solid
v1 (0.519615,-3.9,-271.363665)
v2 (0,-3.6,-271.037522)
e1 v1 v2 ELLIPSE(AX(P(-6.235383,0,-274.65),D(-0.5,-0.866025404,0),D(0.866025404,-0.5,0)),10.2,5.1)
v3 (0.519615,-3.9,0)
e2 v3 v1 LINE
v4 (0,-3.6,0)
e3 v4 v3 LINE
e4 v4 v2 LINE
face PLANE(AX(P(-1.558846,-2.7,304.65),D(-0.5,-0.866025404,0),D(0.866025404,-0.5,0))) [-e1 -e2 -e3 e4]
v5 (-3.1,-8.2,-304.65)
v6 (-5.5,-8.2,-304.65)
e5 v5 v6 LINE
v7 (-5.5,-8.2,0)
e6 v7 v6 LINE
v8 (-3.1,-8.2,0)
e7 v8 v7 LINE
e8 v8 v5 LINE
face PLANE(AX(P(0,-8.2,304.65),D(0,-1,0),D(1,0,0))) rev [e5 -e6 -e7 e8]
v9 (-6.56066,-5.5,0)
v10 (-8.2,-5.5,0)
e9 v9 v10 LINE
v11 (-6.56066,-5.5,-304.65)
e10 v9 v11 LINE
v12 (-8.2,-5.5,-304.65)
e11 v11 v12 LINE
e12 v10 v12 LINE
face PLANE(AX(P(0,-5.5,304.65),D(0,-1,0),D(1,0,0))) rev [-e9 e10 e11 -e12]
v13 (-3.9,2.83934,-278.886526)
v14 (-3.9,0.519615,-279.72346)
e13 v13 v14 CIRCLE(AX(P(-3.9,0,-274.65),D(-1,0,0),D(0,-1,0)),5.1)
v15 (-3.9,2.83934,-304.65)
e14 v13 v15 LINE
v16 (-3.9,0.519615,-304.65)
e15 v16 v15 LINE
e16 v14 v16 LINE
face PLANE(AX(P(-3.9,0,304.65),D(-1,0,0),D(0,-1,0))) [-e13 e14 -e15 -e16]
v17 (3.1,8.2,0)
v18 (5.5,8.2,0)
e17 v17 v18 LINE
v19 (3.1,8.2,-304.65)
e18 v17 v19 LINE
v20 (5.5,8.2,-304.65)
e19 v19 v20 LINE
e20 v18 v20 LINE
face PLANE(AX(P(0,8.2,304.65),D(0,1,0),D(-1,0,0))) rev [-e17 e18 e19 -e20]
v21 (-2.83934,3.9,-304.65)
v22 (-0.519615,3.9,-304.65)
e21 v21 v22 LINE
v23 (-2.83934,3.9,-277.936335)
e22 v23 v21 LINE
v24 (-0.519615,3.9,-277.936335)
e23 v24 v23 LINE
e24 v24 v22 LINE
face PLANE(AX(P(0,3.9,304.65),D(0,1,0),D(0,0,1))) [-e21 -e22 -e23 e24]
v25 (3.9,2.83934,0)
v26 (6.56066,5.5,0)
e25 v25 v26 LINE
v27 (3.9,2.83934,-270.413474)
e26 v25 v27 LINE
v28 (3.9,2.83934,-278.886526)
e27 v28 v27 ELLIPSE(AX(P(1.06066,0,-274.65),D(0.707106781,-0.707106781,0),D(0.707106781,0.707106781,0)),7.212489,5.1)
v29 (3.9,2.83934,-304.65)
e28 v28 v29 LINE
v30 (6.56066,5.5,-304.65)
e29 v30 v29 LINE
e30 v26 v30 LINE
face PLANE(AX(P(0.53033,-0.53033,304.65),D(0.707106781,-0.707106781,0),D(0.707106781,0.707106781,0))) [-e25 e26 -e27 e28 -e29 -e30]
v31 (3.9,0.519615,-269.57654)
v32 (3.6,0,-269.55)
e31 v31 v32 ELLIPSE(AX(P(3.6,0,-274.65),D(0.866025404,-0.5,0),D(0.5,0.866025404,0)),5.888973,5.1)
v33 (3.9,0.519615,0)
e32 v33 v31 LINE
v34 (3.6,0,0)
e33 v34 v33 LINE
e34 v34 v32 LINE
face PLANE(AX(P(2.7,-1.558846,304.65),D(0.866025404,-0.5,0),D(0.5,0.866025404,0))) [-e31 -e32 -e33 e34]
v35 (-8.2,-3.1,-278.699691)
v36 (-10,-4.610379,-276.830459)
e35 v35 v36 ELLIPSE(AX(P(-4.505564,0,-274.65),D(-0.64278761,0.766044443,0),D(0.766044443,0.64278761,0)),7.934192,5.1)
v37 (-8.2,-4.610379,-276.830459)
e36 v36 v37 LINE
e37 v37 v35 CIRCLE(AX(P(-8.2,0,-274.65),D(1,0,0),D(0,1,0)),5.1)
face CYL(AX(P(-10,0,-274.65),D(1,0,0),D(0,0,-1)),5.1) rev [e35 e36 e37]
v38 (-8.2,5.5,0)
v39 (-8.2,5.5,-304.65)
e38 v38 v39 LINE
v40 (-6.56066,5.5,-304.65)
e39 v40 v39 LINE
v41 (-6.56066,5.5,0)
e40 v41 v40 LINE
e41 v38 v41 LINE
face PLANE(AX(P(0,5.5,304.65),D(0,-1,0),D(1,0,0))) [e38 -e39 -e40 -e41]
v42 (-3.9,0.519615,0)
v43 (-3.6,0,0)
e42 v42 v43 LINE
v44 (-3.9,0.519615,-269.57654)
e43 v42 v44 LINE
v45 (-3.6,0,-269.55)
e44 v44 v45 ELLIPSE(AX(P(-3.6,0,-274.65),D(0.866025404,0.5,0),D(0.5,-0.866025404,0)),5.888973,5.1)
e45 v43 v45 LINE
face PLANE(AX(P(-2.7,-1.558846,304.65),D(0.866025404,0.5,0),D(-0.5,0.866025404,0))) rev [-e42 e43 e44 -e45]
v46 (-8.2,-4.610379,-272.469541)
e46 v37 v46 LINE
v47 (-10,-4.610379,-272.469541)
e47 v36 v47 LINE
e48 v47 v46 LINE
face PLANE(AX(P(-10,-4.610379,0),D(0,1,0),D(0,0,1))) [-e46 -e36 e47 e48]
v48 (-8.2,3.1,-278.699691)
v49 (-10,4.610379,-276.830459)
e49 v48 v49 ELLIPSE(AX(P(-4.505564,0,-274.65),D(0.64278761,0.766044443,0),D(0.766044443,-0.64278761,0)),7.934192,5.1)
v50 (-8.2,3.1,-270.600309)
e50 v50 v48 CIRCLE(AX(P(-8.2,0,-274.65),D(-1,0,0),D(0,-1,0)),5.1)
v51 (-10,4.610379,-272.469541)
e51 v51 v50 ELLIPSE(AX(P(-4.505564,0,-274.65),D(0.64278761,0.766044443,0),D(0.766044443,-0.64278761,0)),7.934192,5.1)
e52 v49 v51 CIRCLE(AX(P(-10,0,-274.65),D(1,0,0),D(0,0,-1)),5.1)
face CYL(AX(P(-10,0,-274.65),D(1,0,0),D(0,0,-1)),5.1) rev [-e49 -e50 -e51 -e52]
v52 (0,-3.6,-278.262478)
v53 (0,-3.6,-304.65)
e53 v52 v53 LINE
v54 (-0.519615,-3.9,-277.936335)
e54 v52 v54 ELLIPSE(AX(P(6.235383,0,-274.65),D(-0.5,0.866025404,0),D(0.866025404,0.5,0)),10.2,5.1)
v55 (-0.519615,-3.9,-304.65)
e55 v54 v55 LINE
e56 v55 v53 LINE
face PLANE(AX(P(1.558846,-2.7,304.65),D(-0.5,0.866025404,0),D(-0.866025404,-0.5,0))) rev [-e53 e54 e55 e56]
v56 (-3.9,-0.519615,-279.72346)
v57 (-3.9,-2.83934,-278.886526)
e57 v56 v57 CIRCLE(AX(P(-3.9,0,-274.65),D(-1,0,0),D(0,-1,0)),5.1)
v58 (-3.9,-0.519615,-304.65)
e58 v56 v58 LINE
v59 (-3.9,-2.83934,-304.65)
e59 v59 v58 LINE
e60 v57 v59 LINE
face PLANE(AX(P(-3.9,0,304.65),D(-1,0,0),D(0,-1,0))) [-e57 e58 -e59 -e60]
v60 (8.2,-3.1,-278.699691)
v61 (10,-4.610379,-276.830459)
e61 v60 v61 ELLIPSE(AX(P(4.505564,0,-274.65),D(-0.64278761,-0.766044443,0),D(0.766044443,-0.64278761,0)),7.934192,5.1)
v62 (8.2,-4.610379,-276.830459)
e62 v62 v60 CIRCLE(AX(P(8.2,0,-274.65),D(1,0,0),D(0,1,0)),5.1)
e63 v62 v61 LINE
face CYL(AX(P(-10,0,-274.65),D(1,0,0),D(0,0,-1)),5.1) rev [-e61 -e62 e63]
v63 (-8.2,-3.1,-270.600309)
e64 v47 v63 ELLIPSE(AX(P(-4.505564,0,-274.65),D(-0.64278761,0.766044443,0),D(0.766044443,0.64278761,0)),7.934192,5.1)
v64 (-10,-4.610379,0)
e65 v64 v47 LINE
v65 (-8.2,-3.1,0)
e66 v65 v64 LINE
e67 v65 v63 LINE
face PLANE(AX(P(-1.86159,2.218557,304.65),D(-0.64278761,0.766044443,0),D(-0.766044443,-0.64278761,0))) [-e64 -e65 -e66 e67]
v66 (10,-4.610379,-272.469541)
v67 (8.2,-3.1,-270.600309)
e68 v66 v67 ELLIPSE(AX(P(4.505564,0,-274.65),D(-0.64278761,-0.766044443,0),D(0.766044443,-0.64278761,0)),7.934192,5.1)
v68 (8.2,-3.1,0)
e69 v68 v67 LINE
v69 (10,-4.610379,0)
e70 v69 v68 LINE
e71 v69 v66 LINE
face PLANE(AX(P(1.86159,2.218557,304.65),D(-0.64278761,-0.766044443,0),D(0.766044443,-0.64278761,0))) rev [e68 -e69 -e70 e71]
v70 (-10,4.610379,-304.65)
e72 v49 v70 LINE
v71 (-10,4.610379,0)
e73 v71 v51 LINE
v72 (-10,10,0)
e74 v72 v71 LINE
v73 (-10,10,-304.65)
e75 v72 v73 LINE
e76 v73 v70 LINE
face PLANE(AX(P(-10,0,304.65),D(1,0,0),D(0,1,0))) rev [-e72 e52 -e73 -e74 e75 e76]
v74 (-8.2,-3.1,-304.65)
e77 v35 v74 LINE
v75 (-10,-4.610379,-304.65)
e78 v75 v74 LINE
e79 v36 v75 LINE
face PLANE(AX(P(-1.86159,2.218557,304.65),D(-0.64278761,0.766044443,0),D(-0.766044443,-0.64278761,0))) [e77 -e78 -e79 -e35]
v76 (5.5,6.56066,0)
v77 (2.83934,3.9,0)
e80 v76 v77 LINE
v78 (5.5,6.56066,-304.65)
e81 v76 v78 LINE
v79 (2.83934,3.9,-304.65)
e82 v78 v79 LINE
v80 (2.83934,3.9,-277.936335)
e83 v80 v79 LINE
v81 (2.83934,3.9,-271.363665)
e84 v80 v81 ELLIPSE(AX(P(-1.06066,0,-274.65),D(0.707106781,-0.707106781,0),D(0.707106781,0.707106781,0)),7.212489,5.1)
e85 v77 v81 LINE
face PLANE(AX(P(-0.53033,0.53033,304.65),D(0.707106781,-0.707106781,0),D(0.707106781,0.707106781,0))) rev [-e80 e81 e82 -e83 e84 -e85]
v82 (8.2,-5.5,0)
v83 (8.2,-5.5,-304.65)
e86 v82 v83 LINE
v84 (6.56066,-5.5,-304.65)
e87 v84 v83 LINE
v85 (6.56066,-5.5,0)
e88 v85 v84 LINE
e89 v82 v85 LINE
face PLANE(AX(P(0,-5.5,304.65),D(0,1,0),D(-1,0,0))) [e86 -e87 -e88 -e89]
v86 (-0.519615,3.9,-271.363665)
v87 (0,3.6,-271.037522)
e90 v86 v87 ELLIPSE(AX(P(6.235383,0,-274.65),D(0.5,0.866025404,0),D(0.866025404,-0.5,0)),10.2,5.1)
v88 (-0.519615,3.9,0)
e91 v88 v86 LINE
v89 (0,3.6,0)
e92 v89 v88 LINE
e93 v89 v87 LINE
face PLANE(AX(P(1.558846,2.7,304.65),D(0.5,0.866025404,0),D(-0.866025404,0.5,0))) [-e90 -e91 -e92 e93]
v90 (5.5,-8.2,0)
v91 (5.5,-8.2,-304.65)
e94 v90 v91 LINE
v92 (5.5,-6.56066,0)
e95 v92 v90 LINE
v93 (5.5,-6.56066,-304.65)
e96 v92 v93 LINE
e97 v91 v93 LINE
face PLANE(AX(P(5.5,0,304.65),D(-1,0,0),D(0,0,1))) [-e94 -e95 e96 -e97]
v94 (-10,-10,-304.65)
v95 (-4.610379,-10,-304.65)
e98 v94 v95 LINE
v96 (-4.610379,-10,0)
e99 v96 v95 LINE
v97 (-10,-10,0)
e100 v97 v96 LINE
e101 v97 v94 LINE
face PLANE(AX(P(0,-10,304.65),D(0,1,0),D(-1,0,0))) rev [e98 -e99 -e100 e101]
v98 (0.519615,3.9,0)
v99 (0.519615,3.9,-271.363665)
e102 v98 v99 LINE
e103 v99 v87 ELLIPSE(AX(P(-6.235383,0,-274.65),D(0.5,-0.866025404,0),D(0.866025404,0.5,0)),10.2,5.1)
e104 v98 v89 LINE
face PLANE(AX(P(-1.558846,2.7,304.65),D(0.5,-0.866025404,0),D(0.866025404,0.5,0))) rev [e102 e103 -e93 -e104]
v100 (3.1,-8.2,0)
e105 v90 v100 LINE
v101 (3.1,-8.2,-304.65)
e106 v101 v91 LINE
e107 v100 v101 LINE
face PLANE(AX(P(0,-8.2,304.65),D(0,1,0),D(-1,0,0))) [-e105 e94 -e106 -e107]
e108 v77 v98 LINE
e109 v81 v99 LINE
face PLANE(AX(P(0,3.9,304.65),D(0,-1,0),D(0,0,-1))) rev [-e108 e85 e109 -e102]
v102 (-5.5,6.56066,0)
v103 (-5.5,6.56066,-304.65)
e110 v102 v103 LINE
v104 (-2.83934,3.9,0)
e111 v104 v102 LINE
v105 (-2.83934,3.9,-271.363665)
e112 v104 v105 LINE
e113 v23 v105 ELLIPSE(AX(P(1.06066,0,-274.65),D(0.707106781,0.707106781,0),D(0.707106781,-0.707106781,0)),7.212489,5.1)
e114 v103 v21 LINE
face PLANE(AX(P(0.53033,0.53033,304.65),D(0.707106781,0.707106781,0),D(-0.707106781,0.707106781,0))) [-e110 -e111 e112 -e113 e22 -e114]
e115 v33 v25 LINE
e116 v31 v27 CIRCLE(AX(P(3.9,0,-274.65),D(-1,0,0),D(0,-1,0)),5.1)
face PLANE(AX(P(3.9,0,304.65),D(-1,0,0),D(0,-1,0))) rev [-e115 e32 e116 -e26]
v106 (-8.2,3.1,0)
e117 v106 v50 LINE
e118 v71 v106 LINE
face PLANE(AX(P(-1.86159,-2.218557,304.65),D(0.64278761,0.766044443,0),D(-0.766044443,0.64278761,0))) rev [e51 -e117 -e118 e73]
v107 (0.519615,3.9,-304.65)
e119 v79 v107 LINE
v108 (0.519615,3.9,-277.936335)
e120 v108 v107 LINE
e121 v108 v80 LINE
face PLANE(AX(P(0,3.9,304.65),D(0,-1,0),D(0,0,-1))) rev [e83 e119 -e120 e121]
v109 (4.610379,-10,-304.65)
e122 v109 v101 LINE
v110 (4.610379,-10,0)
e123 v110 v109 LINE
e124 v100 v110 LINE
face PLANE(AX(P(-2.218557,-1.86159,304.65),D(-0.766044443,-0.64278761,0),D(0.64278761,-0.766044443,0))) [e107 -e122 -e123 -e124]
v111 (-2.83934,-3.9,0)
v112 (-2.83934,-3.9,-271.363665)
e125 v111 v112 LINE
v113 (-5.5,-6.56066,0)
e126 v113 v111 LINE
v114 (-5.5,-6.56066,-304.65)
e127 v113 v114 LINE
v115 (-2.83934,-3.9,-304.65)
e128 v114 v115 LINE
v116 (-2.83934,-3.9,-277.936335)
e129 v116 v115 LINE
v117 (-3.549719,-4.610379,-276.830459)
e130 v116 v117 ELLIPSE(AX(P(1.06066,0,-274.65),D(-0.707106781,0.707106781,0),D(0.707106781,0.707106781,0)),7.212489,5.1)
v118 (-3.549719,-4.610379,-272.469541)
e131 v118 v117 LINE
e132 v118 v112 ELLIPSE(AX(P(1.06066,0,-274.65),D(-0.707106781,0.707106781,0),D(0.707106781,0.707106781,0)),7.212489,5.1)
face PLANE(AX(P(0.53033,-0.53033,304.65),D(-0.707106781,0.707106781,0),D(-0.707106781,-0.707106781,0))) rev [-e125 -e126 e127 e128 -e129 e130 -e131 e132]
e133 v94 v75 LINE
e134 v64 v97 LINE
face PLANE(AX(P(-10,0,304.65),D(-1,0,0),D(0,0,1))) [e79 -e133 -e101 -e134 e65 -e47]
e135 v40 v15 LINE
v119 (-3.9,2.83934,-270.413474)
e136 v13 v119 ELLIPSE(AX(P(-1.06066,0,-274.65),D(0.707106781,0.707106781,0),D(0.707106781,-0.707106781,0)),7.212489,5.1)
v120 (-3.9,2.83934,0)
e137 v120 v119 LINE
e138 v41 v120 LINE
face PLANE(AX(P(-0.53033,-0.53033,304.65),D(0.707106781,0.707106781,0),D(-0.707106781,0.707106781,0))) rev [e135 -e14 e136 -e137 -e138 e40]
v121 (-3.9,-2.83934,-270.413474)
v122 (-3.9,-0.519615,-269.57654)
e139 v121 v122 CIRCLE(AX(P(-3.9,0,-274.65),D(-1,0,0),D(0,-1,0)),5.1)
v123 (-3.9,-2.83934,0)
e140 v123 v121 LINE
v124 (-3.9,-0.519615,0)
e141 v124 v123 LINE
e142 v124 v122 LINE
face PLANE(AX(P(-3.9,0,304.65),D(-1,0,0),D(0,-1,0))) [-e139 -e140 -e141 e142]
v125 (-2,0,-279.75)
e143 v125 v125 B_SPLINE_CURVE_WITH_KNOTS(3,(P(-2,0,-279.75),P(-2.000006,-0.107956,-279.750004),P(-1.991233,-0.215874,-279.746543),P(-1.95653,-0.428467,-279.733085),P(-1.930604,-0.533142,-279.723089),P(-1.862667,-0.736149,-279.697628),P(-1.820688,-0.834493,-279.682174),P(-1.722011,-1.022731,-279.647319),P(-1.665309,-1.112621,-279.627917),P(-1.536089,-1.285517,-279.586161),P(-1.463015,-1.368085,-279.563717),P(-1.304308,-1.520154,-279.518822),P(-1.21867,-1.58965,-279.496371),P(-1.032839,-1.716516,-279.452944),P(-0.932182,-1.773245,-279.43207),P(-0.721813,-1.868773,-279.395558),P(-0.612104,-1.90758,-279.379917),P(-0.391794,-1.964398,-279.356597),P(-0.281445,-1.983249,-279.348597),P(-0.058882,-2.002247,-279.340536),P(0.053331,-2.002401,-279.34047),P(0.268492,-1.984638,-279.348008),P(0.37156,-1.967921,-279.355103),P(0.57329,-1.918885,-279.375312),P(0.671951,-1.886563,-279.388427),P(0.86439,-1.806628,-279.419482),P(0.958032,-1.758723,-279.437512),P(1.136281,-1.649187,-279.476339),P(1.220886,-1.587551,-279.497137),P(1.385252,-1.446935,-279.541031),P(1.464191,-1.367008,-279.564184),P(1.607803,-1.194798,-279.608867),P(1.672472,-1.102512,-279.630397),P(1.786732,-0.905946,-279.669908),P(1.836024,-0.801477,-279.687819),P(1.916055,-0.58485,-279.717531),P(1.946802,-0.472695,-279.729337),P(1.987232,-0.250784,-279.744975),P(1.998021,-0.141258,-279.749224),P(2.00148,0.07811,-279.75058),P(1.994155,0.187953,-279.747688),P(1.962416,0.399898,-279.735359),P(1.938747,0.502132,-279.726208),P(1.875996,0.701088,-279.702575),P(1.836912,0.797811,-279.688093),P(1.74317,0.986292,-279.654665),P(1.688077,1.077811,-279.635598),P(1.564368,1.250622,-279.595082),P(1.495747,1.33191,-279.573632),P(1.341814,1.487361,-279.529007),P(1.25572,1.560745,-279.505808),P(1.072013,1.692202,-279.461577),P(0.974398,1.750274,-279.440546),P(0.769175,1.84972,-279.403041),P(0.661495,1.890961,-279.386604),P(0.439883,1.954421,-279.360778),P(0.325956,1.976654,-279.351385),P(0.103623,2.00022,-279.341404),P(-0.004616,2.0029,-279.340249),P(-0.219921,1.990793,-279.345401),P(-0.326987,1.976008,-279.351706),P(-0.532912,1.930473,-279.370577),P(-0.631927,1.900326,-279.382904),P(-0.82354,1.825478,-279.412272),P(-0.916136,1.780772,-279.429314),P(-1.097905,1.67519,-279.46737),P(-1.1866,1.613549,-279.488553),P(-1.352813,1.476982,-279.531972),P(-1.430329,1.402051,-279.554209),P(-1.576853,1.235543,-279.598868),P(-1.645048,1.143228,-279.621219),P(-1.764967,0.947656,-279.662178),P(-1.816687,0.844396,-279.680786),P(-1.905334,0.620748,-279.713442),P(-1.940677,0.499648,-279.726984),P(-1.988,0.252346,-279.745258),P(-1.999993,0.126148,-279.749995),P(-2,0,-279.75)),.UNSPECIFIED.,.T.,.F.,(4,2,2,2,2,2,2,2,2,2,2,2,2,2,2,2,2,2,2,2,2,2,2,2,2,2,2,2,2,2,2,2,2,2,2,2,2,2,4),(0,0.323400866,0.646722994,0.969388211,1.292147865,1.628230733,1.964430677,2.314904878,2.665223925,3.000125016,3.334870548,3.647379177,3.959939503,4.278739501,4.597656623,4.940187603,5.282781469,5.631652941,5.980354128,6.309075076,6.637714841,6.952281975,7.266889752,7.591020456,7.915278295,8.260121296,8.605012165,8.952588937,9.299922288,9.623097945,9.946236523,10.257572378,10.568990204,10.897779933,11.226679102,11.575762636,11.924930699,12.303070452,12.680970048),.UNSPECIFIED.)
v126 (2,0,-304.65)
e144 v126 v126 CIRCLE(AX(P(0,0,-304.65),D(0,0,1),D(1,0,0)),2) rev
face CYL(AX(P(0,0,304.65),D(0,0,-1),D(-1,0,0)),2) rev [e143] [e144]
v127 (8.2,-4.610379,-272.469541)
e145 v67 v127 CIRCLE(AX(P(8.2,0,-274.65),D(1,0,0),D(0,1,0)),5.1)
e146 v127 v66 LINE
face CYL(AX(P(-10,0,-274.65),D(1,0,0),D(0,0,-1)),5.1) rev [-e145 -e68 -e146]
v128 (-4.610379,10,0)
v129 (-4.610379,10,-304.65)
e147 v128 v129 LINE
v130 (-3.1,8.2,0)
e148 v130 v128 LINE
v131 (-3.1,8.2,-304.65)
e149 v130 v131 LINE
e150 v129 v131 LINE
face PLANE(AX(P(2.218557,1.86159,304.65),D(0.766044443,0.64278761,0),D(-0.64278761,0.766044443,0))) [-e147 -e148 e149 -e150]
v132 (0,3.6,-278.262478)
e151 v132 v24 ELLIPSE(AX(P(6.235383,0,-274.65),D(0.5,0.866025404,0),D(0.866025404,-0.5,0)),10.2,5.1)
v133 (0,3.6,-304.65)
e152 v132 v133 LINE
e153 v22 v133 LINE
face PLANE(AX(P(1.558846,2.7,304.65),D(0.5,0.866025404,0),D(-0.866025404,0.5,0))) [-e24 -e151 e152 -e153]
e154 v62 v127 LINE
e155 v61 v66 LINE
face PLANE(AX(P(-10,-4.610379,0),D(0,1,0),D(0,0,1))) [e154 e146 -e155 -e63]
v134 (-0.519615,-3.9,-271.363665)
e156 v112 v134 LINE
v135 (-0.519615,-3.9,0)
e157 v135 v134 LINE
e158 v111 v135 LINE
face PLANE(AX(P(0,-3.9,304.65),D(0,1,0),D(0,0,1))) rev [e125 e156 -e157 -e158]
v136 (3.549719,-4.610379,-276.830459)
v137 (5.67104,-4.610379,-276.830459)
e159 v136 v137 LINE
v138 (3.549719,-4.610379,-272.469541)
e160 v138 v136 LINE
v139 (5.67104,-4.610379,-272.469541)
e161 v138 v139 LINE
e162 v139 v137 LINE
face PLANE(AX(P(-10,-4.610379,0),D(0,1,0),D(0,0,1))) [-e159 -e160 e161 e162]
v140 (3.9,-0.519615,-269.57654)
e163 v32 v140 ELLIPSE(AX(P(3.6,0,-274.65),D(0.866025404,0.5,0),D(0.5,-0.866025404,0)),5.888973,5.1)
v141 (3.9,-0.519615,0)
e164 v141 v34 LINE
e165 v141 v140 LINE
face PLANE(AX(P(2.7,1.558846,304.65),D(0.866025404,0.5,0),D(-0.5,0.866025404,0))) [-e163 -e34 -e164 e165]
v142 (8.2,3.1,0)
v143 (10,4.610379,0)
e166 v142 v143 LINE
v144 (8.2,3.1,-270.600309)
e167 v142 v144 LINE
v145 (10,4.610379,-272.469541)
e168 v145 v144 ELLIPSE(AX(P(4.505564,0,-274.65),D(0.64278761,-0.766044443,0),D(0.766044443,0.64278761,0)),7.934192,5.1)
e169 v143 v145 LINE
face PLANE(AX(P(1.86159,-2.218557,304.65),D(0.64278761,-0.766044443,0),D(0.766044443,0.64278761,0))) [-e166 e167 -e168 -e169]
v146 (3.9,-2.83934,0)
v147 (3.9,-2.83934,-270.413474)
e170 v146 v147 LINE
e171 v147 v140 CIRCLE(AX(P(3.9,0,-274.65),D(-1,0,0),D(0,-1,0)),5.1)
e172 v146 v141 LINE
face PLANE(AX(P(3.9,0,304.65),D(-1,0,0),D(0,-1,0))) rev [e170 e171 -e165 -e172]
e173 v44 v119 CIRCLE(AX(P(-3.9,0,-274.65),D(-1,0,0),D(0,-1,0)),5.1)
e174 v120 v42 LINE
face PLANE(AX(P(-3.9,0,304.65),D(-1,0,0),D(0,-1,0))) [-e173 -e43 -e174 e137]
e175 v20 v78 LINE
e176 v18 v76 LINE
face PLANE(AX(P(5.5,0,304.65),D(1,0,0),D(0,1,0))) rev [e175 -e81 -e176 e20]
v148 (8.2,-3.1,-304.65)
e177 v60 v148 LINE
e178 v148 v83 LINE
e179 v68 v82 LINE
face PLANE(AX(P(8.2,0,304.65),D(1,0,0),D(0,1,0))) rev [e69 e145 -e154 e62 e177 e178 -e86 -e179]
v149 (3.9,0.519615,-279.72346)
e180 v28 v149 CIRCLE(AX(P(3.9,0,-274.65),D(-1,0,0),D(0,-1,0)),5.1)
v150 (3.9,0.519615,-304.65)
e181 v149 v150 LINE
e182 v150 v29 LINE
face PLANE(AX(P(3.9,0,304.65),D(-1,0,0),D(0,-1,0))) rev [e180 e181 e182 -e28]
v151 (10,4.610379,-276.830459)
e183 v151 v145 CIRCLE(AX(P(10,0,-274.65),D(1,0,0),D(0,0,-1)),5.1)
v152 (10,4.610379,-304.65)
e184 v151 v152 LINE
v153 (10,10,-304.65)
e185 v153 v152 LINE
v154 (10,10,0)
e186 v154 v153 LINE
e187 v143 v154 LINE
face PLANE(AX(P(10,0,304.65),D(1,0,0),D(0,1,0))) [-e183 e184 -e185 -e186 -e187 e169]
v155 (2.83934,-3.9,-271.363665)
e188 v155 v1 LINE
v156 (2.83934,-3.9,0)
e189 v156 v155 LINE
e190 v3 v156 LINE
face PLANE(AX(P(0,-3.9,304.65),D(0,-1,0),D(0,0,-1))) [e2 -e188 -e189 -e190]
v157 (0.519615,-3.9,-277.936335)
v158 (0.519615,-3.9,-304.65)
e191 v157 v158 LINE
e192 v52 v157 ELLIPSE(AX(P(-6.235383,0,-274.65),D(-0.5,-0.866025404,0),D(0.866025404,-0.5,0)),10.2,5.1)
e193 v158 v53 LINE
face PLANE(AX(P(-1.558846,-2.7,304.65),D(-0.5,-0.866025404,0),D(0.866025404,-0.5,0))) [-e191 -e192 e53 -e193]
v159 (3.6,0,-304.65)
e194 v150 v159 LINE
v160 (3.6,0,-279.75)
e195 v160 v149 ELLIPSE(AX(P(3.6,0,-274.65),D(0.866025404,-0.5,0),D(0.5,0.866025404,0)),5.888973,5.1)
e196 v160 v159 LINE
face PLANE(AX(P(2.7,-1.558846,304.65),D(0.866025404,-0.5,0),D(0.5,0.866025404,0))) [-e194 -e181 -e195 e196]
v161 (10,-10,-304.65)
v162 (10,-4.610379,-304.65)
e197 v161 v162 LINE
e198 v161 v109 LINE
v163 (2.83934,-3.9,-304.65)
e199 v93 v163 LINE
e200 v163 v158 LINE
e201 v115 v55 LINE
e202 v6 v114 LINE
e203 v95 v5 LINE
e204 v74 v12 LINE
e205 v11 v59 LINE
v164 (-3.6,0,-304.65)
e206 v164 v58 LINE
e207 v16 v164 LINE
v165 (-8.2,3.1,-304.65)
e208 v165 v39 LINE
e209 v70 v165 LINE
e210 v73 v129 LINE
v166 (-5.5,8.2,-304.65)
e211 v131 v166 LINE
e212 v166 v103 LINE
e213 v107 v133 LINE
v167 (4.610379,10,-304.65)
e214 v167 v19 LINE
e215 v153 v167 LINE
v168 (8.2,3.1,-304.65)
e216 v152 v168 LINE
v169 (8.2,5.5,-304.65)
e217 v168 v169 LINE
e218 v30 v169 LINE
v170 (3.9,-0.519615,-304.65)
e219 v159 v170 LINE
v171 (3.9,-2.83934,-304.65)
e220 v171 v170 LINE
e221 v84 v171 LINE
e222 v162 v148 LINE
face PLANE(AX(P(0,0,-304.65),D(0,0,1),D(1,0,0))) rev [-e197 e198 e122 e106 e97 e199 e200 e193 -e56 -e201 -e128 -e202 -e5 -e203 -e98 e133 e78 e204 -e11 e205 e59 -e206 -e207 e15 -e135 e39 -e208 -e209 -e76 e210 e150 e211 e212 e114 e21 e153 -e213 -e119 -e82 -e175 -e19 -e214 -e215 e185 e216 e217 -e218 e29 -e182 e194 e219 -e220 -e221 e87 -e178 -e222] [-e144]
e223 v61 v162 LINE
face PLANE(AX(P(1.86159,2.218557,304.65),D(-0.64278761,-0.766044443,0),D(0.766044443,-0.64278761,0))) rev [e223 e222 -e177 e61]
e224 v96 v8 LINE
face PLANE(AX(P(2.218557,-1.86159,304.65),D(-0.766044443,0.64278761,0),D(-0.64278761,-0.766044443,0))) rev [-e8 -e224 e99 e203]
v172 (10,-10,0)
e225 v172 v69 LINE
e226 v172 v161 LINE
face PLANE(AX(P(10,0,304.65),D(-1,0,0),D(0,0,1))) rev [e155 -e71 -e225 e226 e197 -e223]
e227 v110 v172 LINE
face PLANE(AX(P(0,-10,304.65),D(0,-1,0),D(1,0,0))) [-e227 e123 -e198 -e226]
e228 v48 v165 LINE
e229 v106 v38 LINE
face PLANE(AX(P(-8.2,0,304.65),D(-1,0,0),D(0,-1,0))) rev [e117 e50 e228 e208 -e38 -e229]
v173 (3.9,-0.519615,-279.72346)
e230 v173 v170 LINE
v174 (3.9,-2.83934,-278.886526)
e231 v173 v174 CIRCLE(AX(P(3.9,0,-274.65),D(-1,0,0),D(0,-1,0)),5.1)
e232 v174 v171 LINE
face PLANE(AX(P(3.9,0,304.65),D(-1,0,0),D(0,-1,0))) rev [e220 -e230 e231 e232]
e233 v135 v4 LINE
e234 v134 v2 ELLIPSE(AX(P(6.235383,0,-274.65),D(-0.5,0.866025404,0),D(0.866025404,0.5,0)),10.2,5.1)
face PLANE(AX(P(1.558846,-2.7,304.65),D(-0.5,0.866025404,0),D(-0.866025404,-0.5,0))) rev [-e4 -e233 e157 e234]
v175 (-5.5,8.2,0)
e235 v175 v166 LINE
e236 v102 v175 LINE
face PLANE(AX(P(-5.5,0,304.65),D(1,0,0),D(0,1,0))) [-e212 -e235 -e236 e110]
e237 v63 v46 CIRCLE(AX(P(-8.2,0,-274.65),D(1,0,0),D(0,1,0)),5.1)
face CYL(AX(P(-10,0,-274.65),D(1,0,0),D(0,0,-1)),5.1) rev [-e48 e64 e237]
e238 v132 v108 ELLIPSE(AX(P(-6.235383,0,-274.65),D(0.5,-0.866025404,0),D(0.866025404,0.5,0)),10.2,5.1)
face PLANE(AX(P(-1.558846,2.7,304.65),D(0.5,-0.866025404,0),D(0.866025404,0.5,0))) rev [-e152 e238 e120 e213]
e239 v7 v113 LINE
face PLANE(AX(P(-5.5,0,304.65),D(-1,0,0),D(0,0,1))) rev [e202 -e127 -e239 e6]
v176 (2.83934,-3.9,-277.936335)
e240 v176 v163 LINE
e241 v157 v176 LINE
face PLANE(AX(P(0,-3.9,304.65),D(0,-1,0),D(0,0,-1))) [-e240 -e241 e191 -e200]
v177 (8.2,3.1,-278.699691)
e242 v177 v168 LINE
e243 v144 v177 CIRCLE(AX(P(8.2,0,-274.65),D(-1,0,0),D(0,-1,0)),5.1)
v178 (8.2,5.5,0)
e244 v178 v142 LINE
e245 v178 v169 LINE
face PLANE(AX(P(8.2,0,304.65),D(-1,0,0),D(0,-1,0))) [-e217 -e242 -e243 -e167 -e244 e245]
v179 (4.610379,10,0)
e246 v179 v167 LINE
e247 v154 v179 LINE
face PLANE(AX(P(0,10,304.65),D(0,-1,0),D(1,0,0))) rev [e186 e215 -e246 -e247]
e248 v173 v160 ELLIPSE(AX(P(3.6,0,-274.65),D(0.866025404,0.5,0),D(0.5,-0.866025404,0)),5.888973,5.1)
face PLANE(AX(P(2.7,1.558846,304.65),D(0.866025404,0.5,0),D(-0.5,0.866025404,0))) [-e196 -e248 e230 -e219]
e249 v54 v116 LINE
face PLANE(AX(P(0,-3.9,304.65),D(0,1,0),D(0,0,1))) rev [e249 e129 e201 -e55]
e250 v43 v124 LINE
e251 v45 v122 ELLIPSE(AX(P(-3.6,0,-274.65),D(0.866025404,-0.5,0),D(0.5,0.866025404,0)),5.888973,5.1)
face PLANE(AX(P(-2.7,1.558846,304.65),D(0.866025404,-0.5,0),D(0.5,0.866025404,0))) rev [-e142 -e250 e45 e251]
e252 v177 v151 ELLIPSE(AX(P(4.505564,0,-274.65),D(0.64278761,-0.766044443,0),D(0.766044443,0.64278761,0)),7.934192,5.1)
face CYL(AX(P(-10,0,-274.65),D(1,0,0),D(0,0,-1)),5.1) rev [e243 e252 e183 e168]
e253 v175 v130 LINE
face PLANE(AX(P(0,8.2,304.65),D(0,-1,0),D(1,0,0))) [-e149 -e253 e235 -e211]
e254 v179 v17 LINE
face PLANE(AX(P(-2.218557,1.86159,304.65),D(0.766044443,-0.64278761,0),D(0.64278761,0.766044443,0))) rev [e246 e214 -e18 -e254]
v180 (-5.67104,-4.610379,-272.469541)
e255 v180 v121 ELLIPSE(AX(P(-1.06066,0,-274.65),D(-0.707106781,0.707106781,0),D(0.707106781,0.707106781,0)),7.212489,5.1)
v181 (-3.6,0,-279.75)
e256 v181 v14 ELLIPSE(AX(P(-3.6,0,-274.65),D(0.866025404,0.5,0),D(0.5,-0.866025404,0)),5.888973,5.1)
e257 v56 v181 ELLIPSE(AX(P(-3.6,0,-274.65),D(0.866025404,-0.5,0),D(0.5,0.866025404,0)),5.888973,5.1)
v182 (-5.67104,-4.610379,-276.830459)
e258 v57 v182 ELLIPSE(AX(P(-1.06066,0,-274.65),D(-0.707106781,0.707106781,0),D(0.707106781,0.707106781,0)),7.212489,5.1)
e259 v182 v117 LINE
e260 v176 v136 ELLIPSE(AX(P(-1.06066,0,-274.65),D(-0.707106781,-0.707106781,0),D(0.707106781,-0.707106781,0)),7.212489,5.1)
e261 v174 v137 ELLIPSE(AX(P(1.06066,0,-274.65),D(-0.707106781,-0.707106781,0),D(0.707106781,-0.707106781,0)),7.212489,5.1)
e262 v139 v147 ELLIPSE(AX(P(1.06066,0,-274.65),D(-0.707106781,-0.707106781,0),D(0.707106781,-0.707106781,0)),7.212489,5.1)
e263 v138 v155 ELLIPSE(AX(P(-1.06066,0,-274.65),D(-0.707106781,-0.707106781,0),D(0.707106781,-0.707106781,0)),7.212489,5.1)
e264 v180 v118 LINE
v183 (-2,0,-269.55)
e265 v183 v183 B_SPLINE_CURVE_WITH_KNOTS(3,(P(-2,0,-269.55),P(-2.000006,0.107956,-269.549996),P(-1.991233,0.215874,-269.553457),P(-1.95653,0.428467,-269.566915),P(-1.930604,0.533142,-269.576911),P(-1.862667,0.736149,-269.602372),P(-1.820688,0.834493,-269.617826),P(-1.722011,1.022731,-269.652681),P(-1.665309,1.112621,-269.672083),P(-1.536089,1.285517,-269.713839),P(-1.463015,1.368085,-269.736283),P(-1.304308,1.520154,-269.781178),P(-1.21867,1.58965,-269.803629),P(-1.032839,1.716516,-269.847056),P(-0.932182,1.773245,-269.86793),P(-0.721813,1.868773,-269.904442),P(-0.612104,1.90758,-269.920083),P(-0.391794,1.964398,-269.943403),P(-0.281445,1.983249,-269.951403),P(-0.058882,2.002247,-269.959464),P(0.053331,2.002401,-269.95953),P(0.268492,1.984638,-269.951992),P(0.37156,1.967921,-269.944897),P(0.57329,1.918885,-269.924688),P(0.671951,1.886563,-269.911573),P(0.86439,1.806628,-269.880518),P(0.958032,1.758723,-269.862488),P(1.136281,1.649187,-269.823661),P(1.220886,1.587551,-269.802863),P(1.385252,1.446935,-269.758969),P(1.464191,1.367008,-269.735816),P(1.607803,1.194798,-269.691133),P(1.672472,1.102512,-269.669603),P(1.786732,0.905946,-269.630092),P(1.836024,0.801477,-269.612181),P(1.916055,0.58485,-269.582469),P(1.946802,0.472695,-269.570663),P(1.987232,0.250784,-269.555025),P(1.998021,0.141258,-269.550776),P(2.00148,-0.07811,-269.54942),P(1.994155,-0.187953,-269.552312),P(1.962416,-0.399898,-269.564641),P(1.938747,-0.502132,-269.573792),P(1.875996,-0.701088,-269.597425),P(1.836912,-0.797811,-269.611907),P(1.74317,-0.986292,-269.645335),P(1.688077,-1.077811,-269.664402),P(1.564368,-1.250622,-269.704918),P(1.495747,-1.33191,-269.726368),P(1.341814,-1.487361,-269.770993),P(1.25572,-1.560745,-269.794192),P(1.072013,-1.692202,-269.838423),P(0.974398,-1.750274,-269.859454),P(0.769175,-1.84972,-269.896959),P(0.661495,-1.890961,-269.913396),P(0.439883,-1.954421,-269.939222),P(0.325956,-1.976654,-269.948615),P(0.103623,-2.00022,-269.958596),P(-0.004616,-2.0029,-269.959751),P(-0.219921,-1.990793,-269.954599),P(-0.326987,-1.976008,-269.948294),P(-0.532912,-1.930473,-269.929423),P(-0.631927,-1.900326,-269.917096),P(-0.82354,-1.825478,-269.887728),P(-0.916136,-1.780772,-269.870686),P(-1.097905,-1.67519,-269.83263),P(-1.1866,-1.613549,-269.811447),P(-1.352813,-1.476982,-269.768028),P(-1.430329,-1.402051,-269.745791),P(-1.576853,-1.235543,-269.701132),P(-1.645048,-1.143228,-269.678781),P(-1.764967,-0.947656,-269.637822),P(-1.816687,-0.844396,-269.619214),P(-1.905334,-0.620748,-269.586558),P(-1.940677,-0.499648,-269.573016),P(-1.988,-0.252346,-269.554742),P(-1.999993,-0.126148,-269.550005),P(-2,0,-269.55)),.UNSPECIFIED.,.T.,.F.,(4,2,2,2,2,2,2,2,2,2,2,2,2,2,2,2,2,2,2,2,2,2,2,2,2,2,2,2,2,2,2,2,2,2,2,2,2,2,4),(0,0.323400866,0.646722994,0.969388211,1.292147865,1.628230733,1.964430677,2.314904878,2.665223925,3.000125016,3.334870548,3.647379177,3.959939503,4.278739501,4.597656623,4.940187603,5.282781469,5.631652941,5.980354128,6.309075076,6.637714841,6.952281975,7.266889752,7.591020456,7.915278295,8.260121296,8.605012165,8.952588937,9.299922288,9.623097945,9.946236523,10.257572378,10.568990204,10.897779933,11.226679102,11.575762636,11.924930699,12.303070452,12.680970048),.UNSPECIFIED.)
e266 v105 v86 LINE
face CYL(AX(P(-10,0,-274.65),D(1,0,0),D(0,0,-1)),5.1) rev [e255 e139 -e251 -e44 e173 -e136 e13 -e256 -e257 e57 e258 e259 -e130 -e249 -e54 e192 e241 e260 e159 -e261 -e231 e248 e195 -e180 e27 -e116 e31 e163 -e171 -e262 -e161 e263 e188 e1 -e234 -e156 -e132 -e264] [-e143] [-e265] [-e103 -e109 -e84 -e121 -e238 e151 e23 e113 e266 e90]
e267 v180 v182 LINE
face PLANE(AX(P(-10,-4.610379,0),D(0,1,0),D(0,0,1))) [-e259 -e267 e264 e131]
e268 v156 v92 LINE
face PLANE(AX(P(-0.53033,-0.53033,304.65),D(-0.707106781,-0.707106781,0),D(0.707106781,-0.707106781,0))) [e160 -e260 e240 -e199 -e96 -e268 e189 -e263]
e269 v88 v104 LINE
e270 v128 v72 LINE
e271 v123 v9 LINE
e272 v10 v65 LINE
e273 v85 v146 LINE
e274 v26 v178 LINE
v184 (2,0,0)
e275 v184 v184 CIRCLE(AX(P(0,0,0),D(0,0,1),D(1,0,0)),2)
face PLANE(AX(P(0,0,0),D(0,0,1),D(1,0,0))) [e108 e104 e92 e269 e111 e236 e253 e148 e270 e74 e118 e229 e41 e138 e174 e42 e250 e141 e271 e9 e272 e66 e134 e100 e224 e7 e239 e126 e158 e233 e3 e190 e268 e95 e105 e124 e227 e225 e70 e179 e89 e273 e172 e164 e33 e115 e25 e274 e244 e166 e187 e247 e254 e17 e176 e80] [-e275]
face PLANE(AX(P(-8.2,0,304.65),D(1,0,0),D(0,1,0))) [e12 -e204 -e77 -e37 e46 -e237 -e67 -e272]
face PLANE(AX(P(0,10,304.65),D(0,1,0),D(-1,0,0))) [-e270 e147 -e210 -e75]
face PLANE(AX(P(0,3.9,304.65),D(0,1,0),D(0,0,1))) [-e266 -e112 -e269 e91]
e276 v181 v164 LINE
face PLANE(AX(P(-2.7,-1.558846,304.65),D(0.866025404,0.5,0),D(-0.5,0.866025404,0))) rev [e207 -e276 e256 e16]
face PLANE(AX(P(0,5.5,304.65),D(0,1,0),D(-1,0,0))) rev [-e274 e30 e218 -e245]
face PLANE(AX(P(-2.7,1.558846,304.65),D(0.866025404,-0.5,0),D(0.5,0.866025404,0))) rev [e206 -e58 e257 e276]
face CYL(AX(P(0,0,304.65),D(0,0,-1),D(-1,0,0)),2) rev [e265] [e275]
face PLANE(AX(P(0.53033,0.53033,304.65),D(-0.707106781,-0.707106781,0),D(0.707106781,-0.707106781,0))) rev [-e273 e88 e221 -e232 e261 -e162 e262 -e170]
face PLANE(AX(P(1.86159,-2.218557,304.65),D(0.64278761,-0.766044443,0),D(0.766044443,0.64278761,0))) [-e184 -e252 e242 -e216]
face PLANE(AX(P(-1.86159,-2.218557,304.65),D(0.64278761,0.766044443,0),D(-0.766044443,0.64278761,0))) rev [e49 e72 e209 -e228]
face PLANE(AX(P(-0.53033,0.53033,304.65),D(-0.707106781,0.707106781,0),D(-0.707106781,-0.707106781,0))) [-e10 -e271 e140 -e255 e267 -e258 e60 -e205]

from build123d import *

# Parameters (mm, degrees)
SKETCH1_R           = 2
BOSS_EXTRUDE1_DEPTH = 304.65
CUT_EXTRUDE1_START  = -20
CUT_EXTRUDE1_DEPTH  = 20
CUT_EXTRUDE2_START  = -304.65
SKETCH4_R           = 2
CUT_EXTRUDE2_DEPTH  = 304.65


# Read off the part's stored shape, not the designer's step: Cut-Extrude1
with BuildPart() as part:
    # Sketch1 → Boss-Extrude1 (new, symmetric)
    with BuildSketch(Plane.XY):
        Polygon((10, 10), (10, 4.610379336), (8.2, 3.1), (8.2, 5.5), (6.560660172, 5.5), (3.9, 2.839339828), (3.9, 0.519615242), (3.6, 0), (3.9, -0.519615242), (3.9, -2.839339828), (6.560660172, -5.5), (8.2, -5.5), (8.2, -3.1), (10, -4.610379336), (10, -10), (4.610379336, -10), (3.1, -8.2), (5.5, -8.2), (5.5, -6.560660172), (2.839339828, -3.9), (0.519615242, -3.9), (0, -3.6), (-0.519615242, -3.9), (-2.839339828, -3.9), (-5.5, -6.560660172), (-5.5, -8.2), (-3.1, -8.2), (-4.610379336, -10), (-10, -10), (-10, -4.610379336), (-8.2, -3.1), (-8.2, -5.5), (-6.560660172, -5.5), (-3.9, -2.839339828), (-3.9, -0.519615242), (-3.6, 0), (-3.9, 0.519615242), (-3.9, 2.839339828), (-6.560660172, 5.5), (-8.2, 5.5), (-8.2, 3.1), (-10, 4.610379336), (-10, 10), (-4.610379336, 10), (-3.1, 8.2), (-5.5, 8.2), (-5.5, 6.560660172), (-2.839339828, 3.9), (-0.519615242, 3.9), (0, 3.6), (0.519615242, 3.9), (2.839339828, 3.9), (5.5, 6.560660172), (5.5, 8.2), (3.1, 8.2), (4.610379336, 10), align=None)
        with Locations(Location((0, 0, 0), (0, 0, 180))):
            Circle(SKETCH1_R, mode=Mode.SUBTRACT)
    extrude(amount=BOSS_EXTRUDE1_DEPTH, both=True)

    # Cut-Extrude1 outline → Cut-Extrude1 (cut)
    with BuildSketch(Plane(origin=(10, 0, 0), x_dir=(0, 0, -1), z_dir=(1, 0, 0)).offset(CUT_EXTRUDE1_START)):
        with BuildLine():
            Line((272.469540788, -4.610379336), (276.830459212, -4.610379336))
            ThreePointArc((276.830459212, -4.610379336), (279.606428288, -1.201590041), (278.699691346, 3.1))
            ThreePointArc((278.699691346, 3.1), (274.65, 5.1), (270.600308654, 3.1))
            ThreePointArc((270.600308654, 3.1), (269.693571712, -1.201590041), (272.469540788, -4.610379336))
        make_face()
    extrude(amount=CUT_EXTRUDE1_DEPTH, mode=Mode.SUBTRACT)

    # Sketch4 → Cut-Extrude2 (cut)
    with BuildSketch(Plane.XY.offset(304.65).offset(CUT_EXTRUDE2_START)):
        Polygon((-5.5, 6.560660172), (-5.5, 8.2), (-3.1, 8.2), (-4.610379336, 10), (-10, 10), (-10, 4.610379336), (-8.2, 3.1), (-8.2, 5.5), (-6.560660172, 5.5), (-3.9, 2.839339828), (-3.9, 0.519615242), (-3.6, 0), (-3.9, -0.519615242), (-3.9, -2.839339828), (-6.560660172, -5.5), (-8.2, -5.5), (-8.2, -3.1), (-10, -4.610379336), (-10, -10), (-4.610379336, -10), (-3.1, -8.2), (-5.5, -8.2), (-5.5, -6.560660172), (-2.839339828, -3.9), (-0.519615242, -3.9), (0, -3.6), (0.519615242, -3.9), (2.839339828, -3.9), (5.5, -6.560660172), (5.5, -8.2), (3.1, -8.2), (4.610379336, -10), (10, -10), (10, -4.610379336), (8.2, -3.1), (8.2, -5.5), (6.560660172, -5.5), (3.9, -2.839339828), (3.9, -0.519615242), (3.6, 0), (3.9, 0.519615242), (3.9, 2.839339828), (6.560660172, 5.5), (8.2, 5.5), (8.2, 3.1), (10, 4.610379336), (10, 10), (4.610379336, 10), (3.1, 8.2), (5.5, 8.2), (5.5, 6.560660172), (2.839339828, 3.9), (0.519615242, 3.9), (0, 3.6), (-0.519615242, 3.9), (-2.839339828, 3.9), align=None)
        with Locations(Location((0, 0, 0), (0, 0, 180))):
            Circle(SKETCH4_R, mode=Mode.SUBTRACT)
    extrude(amount=CUT_EXTRUDE2_DEPTH, mode=Mode.SUBTRACT)


solid = part.part
